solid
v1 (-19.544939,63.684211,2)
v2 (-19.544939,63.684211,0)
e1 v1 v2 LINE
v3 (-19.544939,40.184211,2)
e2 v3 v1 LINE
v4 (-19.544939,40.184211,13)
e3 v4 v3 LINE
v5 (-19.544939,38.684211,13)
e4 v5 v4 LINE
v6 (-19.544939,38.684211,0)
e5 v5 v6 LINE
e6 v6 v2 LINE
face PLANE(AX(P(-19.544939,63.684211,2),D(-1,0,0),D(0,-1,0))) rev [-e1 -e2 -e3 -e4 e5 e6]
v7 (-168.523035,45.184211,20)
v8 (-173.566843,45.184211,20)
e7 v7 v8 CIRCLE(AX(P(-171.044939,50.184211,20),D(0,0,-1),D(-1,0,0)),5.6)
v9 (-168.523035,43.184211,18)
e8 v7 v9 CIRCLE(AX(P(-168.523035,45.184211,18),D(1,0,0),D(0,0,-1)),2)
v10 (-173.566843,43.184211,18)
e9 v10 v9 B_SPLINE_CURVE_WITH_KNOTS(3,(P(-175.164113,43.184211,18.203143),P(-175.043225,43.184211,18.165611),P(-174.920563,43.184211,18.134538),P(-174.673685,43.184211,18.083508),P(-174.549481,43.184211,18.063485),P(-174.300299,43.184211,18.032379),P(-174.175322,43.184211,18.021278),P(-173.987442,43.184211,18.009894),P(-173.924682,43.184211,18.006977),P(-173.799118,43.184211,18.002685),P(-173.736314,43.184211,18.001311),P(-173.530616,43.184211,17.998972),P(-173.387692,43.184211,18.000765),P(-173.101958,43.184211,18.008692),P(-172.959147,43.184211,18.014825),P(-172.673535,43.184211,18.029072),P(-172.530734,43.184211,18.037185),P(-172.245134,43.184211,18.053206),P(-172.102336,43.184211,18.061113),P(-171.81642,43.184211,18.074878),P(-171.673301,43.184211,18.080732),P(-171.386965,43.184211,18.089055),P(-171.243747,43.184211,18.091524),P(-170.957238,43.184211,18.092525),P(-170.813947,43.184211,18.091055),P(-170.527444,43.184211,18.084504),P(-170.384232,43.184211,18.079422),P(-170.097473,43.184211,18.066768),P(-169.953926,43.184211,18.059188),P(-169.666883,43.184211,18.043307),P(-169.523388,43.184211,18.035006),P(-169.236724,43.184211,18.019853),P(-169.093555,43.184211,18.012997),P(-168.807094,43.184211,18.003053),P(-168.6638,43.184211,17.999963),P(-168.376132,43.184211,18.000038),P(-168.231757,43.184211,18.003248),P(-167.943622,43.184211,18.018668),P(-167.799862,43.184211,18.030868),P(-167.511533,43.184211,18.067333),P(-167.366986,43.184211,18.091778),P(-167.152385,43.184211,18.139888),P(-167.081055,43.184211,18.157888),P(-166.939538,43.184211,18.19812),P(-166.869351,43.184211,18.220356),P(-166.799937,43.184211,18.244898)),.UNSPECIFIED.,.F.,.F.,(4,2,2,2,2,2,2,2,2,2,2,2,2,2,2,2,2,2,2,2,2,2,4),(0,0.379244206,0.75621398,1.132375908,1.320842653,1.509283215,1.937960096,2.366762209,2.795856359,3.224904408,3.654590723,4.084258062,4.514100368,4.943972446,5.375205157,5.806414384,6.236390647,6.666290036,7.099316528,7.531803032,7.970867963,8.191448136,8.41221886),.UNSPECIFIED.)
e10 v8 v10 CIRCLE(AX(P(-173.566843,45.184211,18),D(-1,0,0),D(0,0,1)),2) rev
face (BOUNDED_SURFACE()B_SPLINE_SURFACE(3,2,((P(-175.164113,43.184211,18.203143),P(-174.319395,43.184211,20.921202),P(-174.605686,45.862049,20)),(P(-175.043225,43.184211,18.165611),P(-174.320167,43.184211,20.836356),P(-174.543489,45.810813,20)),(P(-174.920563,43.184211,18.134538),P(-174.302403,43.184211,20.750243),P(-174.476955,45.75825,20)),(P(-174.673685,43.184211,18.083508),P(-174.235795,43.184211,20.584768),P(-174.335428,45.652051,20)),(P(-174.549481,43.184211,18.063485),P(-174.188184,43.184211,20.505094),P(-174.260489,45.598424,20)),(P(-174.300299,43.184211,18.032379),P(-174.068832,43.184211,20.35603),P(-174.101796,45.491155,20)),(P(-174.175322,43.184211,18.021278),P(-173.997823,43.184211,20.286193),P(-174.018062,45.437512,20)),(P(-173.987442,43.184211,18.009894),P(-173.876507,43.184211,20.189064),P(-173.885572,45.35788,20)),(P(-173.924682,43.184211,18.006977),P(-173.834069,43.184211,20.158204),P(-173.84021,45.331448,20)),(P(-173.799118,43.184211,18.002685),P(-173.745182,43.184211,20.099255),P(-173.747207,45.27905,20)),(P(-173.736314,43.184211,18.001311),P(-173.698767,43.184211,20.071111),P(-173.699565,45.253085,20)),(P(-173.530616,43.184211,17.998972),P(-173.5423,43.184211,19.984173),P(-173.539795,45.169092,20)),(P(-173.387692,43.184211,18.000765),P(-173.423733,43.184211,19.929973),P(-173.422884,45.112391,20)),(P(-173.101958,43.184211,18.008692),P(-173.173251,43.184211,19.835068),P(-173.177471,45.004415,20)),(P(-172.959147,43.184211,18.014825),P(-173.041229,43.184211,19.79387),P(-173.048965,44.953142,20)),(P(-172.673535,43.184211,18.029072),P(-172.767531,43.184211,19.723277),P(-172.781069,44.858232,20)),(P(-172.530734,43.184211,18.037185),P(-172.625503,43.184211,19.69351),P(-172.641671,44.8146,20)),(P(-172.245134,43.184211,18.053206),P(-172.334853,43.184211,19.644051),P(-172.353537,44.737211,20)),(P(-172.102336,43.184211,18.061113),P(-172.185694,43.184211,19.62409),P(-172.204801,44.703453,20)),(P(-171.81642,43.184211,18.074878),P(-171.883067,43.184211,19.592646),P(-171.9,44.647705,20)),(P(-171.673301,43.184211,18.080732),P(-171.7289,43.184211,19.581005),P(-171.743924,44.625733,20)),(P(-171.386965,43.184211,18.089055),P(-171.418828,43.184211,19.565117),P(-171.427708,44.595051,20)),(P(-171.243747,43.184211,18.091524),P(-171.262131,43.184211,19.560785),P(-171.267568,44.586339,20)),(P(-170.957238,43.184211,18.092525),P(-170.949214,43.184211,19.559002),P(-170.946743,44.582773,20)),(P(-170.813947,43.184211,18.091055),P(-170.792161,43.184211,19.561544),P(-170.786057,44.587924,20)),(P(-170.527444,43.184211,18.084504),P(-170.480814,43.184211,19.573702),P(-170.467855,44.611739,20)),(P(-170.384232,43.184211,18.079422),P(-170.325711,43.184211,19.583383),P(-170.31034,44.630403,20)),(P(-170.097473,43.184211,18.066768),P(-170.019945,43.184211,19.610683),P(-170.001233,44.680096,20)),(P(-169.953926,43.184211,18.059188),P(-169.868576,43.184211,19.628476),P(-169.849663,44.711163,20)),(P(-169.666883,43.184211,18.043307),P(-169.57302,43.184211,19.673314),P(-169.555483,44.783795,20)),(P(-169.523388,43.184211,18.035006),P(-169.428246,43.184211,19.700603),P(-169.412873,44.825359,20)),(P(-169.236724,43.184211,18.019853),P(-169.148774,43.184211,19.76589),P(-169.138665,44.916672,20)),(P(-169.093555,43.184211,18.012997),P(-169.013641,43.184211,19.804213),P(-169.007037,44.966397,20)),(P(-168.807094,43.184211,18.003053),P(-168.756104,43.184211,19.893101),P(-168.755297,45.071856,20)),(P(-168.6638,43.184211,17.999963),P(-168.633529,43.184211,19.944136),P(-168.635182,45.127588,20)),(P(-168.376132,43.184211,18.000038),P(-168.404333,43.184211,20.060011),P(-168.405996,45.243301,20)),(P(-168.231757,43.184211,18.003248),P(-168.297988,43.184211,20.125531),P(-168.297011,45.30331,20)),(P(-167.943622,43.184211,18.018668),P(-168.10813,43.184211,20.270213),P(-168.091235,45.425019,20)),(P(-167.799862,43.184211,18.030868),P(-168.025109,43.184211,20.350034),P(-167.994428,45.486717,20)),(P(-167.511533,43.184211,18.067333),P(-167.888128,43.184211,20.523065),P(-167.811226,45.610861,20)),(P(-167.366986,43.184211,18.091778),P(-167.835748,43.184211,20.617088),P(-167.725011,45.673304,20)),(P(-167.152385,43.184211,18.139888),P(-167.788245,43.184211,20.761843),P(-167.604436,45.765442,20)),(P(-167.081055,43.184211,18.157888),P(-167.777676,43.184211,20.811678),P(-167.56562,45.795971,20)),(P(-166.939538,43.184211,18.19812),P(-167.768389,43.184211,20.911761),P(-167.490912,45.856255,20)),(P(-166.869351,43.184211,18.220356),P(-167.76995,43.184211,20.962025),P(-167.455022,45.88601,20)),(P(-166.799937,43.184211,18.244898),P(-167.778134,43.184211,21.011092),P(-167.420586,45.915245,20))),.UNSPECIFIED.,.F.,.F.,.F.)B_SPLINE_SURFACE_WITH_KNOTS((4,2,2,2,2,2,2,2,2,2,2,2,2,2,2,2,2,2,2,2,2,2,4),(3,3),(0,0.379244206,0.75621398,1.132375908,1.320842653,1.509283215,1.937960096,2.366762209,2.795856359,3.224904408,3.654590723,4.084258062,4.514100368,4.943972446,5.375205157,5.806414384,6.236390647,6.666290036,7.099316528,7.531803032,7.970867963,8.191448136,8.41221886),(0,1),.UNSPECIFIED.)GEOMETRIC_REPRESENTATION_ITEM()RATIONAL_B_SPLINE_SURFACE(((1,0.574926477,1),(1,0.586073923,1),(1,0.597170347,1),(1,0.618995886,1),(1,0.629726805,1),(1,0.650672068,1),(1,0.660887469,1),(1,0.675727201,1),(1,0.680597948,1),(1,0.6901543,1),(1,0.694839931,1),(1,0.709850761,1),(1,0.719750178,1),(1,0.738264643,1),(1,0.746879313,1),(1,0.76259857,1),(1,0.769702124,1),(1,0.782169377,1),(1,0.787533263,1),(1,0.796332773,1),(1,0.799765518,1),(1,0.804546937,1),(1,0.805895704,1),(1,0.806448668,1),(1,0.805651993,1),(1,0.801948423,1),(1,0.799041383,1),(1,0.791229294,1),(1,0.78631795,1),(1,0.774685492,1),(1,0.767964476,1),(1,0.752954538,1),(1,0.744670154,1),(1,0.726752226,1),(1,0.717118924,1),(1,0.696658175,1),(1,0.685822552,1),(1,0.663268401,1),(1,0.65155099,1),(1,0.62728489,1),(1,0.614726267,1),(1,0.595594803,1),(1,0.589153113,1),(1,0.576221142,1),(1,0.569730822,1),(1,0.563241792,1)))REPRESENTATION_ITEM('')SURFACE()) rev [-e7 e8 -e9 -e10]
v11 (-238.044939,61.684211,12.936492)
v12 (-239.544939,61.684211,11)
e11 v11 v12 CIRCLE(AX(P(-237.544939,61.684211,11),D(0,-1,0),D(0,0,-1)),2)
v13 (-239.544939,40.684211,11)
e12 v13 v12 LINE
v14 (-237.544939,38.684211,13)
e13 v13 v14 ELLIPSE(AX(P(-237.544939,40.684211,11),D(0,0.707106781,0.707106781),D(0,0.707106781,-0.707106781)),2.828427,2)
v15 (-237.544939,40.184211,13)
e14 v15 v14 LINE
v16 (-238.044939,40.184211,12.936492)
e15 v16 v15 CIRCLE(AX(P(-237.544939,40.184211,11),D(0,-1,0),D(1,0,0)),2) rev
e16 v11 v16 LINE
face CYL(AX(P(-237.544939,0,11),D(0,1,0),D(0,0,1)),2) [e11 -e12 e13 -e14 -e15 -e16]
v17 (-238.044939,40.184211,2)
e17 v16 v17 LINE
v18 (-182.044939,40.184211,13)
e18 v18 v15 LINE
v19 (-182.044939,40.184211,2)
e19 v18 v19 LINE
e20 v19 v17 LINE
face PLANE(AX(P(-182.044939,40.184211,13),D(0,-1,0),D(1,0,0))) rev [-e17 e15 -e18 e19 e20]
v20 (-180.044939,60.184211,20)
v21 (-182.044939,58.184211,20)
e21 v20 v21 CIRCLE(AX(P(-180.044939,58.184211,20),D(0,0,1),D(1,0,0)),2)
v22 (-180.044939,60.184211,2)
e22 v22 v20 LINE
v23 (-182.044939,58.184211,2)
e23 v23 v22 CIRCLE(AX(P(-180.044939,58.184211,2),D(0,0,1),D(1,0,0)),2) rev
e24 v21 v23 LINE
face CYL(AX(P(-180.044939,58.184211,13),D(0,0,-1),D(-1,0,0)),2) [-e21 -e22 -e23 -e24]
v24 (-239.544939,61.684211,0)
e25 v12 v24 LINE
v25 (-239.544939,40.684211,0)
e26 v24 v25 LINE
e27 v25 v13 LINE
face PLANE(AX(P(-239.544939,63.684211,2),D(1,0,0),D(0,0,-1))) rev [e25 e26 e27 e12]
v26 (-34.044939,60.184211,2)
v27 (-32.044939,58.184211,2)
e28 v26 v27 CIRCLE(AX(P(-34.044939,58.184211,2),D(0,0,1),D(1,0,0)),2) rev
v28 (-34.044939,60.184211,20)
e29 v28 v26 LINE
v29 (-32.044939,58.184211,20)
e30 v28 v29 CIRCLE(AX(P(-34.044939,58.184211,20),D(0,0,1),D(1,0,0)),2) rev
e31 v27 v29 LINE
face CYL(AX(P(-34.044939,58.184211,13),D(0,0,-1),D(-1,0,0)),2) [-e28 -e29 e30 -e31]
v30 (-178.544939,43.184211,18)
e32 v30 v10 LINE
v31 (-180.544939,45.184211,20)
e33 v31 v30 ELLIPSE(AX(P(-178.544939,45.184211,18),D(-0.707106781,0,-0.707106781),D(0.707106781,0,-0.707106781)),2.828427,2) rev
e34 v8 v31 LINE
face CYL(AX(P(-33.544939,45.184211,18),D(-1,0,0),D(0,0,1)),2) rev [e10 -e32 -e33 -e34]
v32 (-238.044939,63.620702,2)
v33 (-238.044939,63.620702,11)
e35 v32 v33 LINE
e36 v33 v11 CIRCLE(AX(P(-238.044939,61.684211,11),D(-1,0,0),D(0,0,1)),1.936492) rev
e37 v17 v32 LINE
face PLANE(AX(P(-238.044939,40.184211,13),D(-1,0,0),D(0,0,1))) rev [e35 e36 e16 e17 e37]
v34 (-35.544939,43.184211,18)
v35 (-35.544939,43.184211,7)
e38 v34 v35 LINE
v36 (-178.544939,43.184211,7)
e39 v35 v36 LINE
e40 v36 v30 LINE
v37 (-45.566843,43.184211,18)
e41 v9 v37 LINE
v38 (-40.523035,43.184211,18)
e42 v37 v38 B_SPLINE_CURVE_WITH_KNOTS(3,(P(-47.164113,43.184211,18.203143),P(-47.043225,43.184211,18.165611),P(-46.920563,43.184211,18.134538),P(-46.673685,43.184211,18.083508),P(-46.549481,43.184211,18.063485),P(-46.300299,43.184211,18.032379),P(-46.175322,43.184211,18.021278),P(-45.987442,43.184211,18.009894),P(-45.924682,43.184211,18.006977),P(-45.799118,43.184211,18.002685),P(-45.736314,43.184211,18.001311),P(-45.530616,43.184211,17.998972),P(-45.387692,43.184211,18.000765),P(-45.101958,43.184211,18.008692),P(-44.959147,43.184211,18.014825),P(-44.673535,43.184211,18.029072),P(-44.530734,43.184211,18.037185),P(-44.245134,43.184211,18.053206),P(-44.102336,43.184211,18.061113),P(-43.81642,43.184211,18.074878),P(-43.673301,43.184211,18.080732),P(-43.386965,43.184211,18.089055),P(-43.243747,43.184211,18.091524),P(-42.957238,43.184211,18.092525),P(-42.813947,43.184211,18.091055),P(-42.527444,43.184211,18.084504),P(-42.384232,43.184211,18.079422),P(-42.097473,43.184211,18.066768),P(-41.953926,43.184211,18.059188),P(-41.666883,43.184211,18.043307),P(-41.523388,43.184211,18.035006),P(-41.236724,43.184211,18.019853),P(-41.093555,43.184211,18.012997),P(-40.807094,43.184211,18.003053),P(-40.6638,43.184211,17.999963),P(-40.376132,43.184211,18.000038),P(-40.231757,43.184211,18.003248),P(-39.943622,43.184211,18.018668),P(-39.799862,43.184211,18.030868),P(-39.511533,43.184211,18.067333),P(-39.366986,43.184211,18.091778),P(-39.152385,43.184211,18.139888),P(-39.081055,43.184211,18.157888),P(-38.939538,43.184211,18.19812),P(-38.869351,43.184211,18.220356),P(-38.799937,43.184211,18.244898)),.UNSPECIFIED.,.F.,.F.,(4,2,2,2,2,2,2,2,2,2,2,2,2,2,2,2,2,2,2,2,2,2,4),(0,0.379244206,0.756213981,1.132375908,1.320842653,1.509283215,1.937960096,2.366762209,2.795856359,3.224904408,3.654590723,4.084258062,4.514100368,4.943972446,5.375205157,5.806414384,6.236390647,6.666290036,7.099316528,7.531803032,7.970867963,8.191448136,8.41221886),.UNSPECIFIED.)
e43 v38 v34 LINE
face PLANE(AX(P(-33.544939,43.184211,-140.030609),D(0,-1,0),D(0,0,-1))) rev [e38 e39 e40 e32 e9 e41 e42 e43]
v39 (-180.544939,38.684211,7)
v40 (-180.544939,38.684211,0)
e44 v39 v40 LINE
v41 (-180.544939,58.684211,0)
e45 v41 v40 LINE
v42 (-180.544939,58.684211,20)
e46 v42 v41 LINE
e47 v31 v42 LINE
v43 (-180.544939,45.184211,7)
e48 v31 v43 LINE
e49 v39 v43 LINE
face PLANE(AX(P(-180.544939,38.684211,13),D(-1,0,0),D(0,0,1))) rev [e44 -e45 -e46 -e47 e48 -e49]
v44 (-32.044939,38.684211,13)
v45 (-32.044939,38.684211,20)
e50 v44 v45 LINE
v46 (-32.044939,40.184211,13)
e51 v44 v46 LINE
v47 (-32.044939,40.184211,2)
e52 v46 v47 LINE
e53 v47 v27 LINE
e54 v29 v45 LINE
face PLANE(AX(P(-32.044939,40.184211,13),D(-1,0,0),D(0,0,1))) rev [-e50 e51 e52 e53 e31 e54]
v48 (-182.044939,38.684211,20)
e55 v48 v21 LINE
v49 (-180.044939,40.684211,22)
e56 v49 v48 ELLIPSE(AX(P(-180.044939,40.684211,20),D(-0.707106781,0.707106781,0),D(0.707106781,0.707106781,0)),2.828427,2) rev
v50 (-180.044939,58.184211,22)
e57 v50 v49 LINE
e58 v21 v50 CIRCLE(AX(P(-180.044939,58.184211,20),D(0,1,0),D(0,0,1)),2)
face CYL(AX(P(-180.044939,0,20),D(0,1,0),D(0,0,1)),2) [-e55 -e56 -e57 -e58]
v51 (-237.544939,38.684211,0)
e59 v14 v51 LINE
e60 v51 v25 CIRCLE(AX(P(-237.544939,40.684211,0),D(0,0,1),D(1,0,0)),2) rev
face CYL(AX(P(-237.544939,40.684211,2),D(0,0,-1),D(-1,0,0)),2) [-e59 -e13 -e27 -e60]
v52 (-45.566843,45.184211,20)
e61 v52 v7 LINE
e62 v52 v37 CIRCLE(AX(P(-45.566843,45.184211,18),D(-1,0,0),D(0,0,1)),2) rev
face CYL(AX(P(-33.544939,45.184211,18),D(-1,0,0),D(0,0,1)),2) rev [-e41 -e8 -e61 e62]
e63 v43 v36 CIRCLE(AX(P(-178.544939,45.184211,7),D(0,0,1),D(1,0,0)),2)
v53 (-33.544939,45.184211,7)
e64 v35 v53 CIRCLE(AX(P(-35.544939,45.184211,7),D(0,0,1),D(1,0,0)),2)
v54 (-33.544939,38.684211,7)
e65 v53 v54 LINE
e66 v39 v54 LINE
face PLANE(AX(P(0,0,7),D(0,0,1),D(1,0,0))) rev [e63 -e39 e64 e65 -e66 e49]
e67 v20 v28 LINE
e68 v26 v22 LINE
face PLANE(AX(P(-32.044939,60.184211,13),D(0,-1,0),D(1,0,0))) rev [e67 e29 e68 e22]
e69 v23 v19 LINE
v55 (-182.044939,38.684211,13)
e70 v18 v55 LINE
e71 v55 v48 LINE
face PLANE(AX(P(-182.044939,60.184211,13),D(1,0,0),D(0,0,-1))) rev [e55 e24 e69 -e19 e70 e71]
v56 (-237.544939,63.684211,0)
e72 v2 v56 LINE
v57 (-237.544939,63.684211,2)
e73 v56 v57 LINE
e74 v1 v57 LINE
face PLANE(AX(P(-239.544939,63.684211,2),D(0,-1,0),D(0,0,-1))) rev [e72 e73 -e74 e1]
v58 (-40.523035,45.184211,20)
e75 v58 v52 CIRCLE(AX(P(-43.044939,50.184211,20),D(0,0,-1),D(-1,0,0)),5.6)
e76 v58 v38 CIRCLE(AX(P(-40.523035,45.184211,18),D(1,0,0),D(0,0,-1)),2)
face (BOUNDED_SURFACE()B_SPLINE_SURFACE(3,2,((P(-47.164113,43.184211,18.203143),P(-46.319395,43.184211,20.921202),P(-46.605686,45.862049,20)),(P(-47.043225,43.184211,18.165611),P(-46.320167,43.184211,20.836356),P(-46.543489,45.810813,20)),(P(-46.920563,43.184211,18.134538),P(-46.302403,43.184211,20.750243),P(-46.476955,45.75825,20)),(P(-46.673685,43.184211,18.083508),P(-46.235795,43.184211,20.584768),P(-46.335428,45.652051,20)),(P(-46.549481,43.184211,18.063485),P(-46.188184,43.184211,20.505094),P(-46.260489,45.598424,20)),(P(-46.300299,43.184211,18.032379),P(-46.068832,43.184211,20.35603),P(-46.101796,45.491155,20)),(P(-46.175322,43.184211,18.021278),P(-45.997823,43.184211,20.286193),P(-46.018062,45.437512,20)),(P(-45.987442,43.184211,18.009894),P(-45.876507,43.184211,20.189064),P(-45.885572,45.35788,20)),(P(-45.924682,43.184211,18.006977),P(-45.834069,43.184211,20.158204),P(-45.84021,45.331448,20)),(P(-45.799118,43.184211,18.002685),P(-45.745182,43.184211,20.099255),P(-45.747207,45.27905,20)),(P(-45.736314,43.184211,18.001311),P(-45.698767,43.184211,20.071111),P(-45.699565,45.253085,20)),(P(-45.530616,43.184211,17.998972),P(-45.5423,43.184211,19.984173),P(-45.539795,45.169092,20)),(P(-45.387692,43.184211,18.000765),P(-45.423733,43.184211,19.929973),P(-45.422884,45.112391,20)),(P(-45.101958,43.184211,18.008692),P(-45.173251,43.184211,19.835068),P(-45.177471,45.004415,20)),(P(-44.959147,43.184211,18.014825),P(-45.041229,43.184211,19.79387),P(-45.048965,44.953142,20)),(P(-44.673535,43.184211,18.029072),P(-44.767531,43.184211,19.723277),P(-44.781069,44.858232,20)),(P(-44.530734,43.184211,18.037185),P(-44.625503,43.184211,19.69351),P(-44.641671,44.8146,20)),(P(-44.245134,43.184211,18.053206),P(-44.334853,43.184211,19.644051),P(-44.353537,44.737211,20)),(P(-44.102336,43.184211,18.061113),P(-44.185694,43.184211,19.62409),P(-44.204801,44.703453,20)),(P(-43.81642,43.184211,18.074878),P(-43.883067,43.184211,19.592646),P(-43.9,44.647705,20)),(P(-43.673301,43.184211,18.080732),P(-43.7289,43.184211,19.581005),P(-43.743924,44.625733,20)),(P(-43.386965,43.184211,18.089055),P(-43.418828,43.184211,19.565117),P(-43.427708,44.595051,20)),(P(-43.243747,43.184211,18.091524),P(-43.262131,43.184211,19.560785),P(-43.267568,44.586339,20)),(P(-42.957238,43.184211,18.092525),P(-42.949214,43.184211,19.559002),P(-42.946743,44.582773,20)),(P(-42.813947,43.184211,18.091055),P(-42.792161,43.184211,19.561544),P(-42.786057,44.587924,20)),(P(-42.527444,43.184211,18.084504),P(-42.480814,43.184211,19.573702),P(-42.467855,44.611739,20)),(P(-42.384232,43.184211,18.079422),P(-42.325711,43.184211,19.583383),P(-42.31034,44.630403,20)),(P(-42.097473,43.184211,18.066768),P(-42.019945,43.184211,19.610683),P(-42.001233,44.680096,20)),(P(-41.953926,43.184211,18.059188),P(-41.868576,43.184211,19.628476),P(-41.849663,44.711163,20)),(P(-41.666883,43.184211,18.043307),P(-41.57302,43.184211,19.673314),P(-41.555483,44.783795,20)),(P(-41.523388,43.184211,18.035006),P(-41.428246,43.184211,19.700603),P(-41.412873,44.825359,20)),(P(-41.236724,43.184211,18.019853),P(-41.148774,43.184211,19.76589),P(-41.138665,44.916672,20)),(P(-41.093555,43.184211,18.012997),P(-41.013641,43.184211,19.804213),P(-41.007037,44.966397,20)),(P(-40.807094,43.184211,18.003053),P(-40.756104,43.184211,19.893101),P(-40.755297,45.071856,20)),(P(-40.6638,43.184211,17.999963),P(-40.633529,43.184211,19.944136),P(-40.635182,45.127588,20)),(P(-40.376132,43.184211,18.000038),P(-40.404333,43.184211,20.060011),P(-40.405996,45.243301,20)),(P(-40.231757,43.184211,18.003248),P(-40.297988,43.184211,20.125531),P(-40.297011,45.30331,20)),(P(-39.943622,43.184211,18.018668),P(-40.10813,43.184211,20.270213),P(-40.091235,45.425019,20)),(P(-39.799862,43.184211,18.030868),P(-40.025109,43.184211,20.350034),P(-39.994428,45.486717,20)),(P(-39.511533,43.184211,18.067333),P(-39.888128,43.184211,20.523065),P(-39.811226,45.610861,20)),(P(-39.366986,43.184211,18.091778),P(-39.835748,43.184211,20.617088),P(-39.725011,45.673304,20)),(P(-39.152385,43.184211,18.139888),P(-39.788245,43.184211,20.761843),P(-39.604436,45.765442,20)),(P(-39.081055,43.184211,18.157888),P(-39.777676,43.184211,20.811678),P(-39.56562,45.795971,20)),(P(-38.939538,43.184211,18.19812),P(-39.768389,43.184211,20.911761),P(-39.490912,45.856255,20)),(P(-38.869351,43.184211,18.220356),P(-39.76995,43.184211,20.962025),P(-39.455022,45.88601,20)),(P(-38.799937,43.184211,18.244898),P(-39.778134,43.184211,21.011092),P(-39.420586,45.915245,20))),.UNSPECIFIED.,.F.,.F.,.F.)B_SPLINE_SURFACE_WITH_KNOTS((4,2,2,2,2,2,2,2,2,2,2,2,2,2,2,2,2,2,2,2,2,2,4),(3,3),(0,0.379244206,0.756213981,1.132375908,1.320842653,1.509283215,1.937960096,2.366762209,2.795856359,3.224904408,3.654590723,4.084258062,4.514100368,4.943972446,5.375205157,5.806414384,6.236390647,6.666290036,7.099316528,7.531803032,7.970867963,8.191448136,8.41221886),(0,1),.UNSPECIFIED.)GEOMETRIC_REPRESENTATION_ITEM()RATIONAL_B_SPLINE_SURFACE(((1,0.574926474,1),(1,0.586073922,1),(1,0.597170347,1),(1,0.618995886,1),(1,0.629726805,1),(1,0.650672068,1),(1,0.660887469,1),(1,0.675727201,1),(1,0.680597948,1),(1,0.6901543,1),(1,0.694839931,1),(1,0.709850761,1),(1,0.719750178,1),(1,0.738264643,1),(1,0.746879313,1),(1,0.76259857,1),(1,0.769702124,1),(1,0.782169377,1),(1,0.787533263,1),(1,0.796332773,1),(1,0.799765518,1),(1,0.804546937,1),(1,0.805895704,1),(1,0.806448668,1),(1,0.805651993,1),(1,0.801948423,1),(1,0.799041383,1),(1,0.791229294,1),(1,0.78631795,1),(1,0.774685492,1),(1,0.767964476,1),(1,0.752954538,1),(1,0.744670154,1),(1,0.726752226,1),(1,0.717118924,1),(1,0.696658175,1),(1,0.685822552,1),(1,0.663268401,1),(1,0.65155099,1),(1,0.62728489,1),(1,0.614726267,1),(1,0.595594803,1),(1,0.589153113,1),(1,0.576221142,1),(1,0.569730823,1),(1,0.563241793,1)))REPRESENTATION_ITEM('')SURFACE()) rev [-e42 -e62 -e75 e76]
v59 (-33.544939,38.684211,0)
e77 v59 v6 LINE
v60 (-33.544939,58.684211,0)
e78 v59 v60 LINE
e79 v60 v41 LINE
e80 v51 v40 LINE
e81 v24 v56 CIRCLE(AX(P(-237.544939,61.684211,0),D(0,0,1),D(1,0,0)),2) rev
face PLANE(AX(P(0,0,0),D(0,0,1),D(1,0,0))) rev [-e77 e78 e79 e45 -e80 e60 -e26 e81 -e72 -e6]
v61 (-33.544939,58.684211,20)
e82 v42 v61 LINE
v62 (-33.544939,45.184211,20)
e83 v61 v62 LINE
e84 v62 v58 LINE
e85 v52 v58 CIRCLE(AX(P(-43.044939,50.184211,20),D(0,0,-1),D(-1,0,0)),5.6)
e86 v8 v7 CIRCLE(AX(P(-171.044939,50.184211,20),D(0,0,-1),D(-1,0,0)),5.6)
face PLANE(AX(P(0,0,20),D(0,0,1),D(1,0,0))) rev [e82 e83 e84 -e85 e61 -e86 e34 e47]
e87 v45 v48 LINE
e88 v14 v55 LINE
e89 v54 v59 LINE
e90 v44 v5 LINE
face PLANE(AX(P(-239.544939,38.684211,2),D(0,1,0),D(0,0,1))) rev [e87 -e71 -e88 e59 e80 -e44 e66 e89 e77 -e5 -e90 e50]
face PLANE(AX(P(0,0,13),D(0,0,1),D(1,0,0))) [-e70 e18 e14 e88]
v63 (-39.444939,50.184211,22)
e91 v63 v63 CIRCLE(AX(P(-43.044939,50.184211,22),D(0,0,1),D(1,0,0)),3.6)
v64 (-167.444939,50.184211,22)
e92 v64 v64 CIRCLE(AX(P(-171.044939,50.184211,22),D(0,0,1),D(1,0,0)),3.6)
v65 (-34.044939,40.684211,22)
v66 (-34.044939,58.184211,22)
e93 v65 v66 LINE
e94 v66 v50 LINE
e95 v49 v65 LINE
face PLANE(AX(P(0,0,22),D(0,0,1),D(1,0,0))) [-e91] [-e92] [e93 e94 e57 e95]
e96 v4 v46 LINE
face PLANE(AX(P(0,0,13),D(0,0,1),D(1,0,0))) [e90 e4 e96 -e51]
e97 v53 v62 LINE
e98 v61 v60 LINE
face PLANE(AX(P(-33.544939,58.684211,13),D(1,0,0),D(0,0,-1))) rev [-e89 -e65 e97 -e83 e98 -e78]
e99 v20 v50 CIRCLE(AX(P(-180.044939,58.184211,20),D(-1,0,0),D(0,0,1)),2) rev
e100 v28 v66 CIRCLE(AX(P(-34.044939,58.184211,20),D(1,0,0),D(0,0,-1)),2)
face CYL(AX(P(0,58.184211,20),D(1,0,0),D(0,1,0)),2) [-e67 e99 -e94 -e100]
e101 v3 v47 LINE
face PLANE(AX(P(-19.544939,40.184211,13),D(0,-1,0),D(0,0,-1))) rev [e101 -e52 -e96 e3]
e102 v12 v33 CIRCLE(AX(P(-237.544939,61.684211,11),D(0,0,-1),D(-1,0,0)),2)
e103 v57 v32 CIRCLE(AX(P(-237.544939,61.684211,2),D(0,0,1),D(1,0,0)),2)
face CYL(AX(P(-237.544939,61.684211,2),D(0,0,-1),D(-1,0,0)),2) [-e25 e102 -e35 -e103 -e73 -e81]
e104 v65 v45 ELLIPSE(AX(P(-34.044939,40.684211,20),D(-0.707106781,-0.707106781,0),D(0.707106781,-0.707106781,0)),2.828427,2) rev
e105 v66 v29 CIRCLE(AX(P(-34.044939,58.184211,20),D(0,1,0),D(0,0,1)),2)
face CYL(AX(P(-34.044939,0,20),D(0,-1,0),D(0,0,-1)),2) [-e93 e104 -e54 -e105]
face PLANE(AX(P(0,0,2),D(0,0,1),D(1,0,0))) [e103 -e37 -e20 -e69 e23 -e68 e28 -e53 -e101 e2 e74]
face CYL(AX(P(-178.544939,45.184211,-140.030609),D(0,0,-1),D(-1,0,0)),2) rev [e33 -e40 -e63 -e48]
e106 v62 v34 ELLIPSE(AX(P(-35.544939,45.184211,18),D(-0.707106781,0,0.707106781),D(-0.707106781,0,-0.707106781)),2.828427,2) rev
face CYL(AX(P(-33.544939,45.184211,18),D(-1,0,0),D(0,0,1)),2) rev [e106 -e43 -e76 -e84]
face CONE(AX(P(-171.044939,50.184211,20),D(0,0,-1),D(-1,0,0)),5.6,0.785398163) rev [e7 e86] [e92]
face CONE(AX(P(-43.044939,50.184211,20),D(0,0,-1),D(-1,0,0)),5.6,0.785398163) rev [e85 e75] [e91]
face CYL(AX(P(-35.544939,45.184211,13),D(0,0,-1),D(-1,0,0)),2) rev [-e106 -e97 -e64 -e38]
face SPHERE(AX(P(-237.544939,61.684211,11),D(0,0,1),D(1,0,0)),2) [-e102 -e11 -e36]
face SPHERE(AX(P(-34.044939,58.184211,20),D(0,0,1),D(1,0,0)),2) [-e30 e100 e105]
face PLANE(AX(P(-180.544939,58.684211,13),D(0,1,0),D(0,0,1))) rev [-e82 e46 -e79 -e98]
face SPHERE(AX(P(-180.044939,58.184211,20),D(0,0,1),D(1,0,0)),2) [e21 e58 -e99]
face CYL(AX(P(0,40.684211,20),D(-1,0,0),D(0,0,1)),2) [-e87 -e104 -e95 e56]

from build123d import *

# Parameters (mm, degrees)
CROQUIS1_W                                   = 220
CROQUIS1_H                                   = 25
SALIENTE_EXTRUIR1_DEPTH                      = 2
SALIENTE_EXTRUIR2_DEPTH                      = 11
SALIENTE_EXTRUIR3_DEPTH                      = 7
CROQUIS5_W                                   = 150
CROQUIS5_H                                   = 20
SALIENTE_EXTRUIR4_DEPTH                      = 2
REDONDEO2_R                                  = 2
REDONDEO3_R                                  = 2
REDONDEO4_R                                  = 2
CROQUIS7_W                                   = 147
CROQUIS7_H                                   = 20
CORTAR_EXTRUIR1_DEPTH                        = 2
CROQUIS10_W                                  = 150
CROQUIS10_H                                  = 1.5
SALIENTE_EXTRUIR8_DEPTH                      = 15
CROQUIS11_R                                  = 2.25
CORTAR_EXTRUIR2_DEPTH                        = 15
REFRENTADO_PARA_TORNILLO_TAP_N_CON_C_2_COUNT = 2
REFRENTADO_PARA_TORNILLO_TAP_N_CON_C_2_PITCH = 128
REDONDEO5_R                                  = 2
CROQUIS14_W                                  = 147
CROQUIS14_H                                  = 3
SALIENTE_EXTRUIR9_DEPTH                      = 13
REDONDEO6_R                                  = 2


with BuildPart() as part:
    # Croquis1 → Saliente-Extruir1 (new body)
    with BuildSketch(Plane.XY):
        with Locations((-129.544939143, 51.184210526)):
            Rectangle(CROQUIS1_W, CROQUIS1_H)
    extrude(amount=SALIENTE_EXTRUIR1_DEPTH)

    # Croquis3 → Saliente-Extruir2 (add)
    with BuildSketch(Plane.XY.offset(2)):
        Polygon((-239.544939143, 63.684210526), (-239.544939143, 38.684210526), (-180.544939143, 38.684210526), (-180.544939143, 58.684210526), (-33.544939143, 58.684210526), (-33.544939143, 38.684210526), (-19.544939143, 38.684210526), (-19.544939143, 40.184210526), (-32.044939143, 40.184210526), (-32.044939143, 60.184210526), (-182.044939143, 60.184210526), (-182.044939143, 40.184210526), (-238.044939143, 40.184210526), (-238.044939143, 63.684210526), align=None)
    extrude(amount=SALIENTE_EXTRUIR2_DEPTH)

    # Croquis4 → Saliente-Extruir3 (add)
    with BuildSketch(Plane.XY.offset(13)):
        Polygon((-182.044939143, 40.184210526), (-180.544939143, 40.184210526), (-180.544939143, 40.470961068), (-180.544939143, 58.684210526), (-33.544939143, 58.684210526), (-33.544939143, 40.470961068), (-33.544939143, 40.184210526), (-32.044939143, 40.184210526), (-32.044939143, 40.470961068), (-32.044939143, 60.184210526), (-182.044939143, 60.184210526), align=None)
    extrude(amount=SALIENTE_EXTRUIR3_DEPTH)

    # Croquis5 → Saliente-Extruir4 (add)
    with BuildSketch(Plane.XY.offset(20)):
        with Locations((-107.044939143, 50.184210526)):
            Rectangle(CROQUIS5_W, CROQUIS5_H)
    extrude(amount=SALIENTE_EXTRUIR4_DEPTH)

    # Redondeo2
    redondeo2_edges = [part.edges().sort_by_distance(p)[0] for p in [
        (-239.544939143, 63.684210526, 6.5),
    ]]
    fillet(redondeo2_edges, radius=REDONDEO2_R)

    # Redondeo3
    # the kernel refuses this fillet: 2 mm, written as the material it takes off along each edge
    with BuildSketch(Plane(origin=(-239.544939143, 61.684210526, 13), x_dir=(1, 0, 0), z_dir=(0, -1, 0))) as redondeo3_piece_1:
        with BuildLine():
            CenterArc((REDONDEO3_R, -REDONDEO3_R), REDONDEO3_R, 90, 90)
            Line((0, -REDONDEO3_R), (0, 0))
            Line((0, 0), (REDONDEO3_R, 0))
        make_face()
    extrude(amount=28, mode=Mode.SUBTRACT)
    with BuildSketch(Plane(origin=(-237.544939143, 61.684210526, 13), x_dir=(0.7793111641702657, -0.6266371433290445, 0), z_dir=(-0.6266371433290445, -0.7793111641702657, 0))) as redondeo3_piece_2:
        with BuildLine():
            CenterArc((2 - REDONDEO3_R, -REDONDEO3_R), REDONDEO3_R, 0, 90)
            Line((2 - REDONDEO3_R, 0), (2, 0))
            Line((2, 0), (2, -REDONDEO3_R))
        make_face()
    revolve(axis=Axis((-237.544939143, 61.684210526, 13), (0, 0, 1)), revolution_arc=218.802450559, mode=Mode.SUBTRACT)

    # Redondeo4
    # the kernel refuses this fillet: 2 mm, written as the material it takes off along each edge
    with BuildSketch(Plane(origin=(-239.544939143, 38.684210526, -5), x_dir=(0, 1, 0), z_dir=(0, 0, 1))) as redondeo4_piece_1:
        with BuildLine():
            CenterArc((REDONDEO4_R, -REDONDEO4_R), REDONDEO4_R, 90, 90)
            Line((0, -REDONDEO4_R), (0, 0))
            Line((0, 0), (REDONDEO4_R, 0))
        make_face()
    extrude(amount=21, mode=Mode.SUBTRACT)

    # Croquis7 → Cortar-Extruir1 (cut)
    with BuildSketch(Plane.XY.offset(2)):
        with Locations((-107.044939143, 48.684210526)):
            Rectangle(CROQUIS7_W, CROQUIS7_H)
    extrude(amount=-CORTAR_EXTRUIR1_DEPTH, mode=Mode.SUBTRACT)

    # Croquis10 → Saliente-Extruir8 (add)
    with BuildSketch(Plane.XY.offset(22)):
        with Locations((-107.044939143, 39.434210526)):
            Rectangle(CROQUIS10_W, CROQUIS10_H)
    extrude(amount=-SALIENTE_EXTRUIR8_DEPTH)

    # Croquis11 → Cortar-Extruir2 (cut)
    with BuildSketch(Plane.XY.offset(22)):
        with Locations((-171.044939143, 50.184210526)):
            Circle(CROQUIS11_R)
        with Locations((-43.044939143, 50.184210526)):
            Circle(CROQUIS11_R)
    extrude(amount=-CORTAR_EXTRUIR2_DEPTH, mode=Mode.SUBTRACT)

    # Croquis12 → Refrentado para tornillo tapón con cabeza plana de clavija de M51 (revolve, cut)
    with BuildSketch(Plane(origin=(-171.044939143, 50.184210526, 20), x_dir=(0, 1, 0), z_dir=(1, 0, 0))):
        Polygon((0, 0), (0, 2), (2.9, 2), (2.9, 2.7), (5.6, 0), align=None)
    refrentado_para_tornillo_tap_n_con_cabez = revolve(axis=Axis((-171.044939143, 50.184210526, 13.65), (0, 0, 1)), mode=Mode.SUBTRACT)

    # Refrentado para tornillo tap_n con c 2: Refrentado para tornillo tapón con cabeza plana de clavija de M51 ×2
    with Locations(*[(i * REFRENTADO_PARA_TORNILLO_TAP_N_CON_C_2_PITCH, 0, 0) for i in range(1, REFRENTADO_PARA_TORNILLO_TAP_N_CON_C_2_COUNT)]):
        add(refrentado_para_tornillo_tap_n_con_cabez, mode=Mode.SUBTRACT)

    # Redondeo5
    redondeo5_edges = [part.edges().sort_by_distance(p)[0] for p in [
        (-107.044939143, 38.684210526, 22),
        (-32.044939143, 60.184210526, 12),
        (-182.044939143, 60.184210526, 12),
        (-182.044939143, 49.434210526, 22),
        (-32.044939143, 49.434210526, 22),
        (-107.044939143, 60.184210526, 22),
    ]]
    fillet(redondeo5_edges, radius=REDONDEO5_R)

    # Croquis14 → Saliente-Extruir9 (add)
    with BuildSketch(Plane(origin=(0, 0, 20), x_dir=(-1, 0, 0), z_dir=(0, 0, -1))):
        with Locations((107.044939143, 41.684210526)):
            Rectangle(CROQUIS14_W, CROQUIS14_H)
    extrude(amount=SALIENTE_EXTRUIR9_DEPTH)

    # Redondeo6
    redondeo6_edges = [part.edges().sort_by_distance(p)[0] for p in [
        (-180.544939143, 43.184210526, 13.5),
        (-107.044939143, 43.184210526, 20),
        (-33.544939143, 43.184210526, 13.5),
    ]]
    fillet(redondeo6_edges, radius=REDONDEO6_R)


solid = part.part
